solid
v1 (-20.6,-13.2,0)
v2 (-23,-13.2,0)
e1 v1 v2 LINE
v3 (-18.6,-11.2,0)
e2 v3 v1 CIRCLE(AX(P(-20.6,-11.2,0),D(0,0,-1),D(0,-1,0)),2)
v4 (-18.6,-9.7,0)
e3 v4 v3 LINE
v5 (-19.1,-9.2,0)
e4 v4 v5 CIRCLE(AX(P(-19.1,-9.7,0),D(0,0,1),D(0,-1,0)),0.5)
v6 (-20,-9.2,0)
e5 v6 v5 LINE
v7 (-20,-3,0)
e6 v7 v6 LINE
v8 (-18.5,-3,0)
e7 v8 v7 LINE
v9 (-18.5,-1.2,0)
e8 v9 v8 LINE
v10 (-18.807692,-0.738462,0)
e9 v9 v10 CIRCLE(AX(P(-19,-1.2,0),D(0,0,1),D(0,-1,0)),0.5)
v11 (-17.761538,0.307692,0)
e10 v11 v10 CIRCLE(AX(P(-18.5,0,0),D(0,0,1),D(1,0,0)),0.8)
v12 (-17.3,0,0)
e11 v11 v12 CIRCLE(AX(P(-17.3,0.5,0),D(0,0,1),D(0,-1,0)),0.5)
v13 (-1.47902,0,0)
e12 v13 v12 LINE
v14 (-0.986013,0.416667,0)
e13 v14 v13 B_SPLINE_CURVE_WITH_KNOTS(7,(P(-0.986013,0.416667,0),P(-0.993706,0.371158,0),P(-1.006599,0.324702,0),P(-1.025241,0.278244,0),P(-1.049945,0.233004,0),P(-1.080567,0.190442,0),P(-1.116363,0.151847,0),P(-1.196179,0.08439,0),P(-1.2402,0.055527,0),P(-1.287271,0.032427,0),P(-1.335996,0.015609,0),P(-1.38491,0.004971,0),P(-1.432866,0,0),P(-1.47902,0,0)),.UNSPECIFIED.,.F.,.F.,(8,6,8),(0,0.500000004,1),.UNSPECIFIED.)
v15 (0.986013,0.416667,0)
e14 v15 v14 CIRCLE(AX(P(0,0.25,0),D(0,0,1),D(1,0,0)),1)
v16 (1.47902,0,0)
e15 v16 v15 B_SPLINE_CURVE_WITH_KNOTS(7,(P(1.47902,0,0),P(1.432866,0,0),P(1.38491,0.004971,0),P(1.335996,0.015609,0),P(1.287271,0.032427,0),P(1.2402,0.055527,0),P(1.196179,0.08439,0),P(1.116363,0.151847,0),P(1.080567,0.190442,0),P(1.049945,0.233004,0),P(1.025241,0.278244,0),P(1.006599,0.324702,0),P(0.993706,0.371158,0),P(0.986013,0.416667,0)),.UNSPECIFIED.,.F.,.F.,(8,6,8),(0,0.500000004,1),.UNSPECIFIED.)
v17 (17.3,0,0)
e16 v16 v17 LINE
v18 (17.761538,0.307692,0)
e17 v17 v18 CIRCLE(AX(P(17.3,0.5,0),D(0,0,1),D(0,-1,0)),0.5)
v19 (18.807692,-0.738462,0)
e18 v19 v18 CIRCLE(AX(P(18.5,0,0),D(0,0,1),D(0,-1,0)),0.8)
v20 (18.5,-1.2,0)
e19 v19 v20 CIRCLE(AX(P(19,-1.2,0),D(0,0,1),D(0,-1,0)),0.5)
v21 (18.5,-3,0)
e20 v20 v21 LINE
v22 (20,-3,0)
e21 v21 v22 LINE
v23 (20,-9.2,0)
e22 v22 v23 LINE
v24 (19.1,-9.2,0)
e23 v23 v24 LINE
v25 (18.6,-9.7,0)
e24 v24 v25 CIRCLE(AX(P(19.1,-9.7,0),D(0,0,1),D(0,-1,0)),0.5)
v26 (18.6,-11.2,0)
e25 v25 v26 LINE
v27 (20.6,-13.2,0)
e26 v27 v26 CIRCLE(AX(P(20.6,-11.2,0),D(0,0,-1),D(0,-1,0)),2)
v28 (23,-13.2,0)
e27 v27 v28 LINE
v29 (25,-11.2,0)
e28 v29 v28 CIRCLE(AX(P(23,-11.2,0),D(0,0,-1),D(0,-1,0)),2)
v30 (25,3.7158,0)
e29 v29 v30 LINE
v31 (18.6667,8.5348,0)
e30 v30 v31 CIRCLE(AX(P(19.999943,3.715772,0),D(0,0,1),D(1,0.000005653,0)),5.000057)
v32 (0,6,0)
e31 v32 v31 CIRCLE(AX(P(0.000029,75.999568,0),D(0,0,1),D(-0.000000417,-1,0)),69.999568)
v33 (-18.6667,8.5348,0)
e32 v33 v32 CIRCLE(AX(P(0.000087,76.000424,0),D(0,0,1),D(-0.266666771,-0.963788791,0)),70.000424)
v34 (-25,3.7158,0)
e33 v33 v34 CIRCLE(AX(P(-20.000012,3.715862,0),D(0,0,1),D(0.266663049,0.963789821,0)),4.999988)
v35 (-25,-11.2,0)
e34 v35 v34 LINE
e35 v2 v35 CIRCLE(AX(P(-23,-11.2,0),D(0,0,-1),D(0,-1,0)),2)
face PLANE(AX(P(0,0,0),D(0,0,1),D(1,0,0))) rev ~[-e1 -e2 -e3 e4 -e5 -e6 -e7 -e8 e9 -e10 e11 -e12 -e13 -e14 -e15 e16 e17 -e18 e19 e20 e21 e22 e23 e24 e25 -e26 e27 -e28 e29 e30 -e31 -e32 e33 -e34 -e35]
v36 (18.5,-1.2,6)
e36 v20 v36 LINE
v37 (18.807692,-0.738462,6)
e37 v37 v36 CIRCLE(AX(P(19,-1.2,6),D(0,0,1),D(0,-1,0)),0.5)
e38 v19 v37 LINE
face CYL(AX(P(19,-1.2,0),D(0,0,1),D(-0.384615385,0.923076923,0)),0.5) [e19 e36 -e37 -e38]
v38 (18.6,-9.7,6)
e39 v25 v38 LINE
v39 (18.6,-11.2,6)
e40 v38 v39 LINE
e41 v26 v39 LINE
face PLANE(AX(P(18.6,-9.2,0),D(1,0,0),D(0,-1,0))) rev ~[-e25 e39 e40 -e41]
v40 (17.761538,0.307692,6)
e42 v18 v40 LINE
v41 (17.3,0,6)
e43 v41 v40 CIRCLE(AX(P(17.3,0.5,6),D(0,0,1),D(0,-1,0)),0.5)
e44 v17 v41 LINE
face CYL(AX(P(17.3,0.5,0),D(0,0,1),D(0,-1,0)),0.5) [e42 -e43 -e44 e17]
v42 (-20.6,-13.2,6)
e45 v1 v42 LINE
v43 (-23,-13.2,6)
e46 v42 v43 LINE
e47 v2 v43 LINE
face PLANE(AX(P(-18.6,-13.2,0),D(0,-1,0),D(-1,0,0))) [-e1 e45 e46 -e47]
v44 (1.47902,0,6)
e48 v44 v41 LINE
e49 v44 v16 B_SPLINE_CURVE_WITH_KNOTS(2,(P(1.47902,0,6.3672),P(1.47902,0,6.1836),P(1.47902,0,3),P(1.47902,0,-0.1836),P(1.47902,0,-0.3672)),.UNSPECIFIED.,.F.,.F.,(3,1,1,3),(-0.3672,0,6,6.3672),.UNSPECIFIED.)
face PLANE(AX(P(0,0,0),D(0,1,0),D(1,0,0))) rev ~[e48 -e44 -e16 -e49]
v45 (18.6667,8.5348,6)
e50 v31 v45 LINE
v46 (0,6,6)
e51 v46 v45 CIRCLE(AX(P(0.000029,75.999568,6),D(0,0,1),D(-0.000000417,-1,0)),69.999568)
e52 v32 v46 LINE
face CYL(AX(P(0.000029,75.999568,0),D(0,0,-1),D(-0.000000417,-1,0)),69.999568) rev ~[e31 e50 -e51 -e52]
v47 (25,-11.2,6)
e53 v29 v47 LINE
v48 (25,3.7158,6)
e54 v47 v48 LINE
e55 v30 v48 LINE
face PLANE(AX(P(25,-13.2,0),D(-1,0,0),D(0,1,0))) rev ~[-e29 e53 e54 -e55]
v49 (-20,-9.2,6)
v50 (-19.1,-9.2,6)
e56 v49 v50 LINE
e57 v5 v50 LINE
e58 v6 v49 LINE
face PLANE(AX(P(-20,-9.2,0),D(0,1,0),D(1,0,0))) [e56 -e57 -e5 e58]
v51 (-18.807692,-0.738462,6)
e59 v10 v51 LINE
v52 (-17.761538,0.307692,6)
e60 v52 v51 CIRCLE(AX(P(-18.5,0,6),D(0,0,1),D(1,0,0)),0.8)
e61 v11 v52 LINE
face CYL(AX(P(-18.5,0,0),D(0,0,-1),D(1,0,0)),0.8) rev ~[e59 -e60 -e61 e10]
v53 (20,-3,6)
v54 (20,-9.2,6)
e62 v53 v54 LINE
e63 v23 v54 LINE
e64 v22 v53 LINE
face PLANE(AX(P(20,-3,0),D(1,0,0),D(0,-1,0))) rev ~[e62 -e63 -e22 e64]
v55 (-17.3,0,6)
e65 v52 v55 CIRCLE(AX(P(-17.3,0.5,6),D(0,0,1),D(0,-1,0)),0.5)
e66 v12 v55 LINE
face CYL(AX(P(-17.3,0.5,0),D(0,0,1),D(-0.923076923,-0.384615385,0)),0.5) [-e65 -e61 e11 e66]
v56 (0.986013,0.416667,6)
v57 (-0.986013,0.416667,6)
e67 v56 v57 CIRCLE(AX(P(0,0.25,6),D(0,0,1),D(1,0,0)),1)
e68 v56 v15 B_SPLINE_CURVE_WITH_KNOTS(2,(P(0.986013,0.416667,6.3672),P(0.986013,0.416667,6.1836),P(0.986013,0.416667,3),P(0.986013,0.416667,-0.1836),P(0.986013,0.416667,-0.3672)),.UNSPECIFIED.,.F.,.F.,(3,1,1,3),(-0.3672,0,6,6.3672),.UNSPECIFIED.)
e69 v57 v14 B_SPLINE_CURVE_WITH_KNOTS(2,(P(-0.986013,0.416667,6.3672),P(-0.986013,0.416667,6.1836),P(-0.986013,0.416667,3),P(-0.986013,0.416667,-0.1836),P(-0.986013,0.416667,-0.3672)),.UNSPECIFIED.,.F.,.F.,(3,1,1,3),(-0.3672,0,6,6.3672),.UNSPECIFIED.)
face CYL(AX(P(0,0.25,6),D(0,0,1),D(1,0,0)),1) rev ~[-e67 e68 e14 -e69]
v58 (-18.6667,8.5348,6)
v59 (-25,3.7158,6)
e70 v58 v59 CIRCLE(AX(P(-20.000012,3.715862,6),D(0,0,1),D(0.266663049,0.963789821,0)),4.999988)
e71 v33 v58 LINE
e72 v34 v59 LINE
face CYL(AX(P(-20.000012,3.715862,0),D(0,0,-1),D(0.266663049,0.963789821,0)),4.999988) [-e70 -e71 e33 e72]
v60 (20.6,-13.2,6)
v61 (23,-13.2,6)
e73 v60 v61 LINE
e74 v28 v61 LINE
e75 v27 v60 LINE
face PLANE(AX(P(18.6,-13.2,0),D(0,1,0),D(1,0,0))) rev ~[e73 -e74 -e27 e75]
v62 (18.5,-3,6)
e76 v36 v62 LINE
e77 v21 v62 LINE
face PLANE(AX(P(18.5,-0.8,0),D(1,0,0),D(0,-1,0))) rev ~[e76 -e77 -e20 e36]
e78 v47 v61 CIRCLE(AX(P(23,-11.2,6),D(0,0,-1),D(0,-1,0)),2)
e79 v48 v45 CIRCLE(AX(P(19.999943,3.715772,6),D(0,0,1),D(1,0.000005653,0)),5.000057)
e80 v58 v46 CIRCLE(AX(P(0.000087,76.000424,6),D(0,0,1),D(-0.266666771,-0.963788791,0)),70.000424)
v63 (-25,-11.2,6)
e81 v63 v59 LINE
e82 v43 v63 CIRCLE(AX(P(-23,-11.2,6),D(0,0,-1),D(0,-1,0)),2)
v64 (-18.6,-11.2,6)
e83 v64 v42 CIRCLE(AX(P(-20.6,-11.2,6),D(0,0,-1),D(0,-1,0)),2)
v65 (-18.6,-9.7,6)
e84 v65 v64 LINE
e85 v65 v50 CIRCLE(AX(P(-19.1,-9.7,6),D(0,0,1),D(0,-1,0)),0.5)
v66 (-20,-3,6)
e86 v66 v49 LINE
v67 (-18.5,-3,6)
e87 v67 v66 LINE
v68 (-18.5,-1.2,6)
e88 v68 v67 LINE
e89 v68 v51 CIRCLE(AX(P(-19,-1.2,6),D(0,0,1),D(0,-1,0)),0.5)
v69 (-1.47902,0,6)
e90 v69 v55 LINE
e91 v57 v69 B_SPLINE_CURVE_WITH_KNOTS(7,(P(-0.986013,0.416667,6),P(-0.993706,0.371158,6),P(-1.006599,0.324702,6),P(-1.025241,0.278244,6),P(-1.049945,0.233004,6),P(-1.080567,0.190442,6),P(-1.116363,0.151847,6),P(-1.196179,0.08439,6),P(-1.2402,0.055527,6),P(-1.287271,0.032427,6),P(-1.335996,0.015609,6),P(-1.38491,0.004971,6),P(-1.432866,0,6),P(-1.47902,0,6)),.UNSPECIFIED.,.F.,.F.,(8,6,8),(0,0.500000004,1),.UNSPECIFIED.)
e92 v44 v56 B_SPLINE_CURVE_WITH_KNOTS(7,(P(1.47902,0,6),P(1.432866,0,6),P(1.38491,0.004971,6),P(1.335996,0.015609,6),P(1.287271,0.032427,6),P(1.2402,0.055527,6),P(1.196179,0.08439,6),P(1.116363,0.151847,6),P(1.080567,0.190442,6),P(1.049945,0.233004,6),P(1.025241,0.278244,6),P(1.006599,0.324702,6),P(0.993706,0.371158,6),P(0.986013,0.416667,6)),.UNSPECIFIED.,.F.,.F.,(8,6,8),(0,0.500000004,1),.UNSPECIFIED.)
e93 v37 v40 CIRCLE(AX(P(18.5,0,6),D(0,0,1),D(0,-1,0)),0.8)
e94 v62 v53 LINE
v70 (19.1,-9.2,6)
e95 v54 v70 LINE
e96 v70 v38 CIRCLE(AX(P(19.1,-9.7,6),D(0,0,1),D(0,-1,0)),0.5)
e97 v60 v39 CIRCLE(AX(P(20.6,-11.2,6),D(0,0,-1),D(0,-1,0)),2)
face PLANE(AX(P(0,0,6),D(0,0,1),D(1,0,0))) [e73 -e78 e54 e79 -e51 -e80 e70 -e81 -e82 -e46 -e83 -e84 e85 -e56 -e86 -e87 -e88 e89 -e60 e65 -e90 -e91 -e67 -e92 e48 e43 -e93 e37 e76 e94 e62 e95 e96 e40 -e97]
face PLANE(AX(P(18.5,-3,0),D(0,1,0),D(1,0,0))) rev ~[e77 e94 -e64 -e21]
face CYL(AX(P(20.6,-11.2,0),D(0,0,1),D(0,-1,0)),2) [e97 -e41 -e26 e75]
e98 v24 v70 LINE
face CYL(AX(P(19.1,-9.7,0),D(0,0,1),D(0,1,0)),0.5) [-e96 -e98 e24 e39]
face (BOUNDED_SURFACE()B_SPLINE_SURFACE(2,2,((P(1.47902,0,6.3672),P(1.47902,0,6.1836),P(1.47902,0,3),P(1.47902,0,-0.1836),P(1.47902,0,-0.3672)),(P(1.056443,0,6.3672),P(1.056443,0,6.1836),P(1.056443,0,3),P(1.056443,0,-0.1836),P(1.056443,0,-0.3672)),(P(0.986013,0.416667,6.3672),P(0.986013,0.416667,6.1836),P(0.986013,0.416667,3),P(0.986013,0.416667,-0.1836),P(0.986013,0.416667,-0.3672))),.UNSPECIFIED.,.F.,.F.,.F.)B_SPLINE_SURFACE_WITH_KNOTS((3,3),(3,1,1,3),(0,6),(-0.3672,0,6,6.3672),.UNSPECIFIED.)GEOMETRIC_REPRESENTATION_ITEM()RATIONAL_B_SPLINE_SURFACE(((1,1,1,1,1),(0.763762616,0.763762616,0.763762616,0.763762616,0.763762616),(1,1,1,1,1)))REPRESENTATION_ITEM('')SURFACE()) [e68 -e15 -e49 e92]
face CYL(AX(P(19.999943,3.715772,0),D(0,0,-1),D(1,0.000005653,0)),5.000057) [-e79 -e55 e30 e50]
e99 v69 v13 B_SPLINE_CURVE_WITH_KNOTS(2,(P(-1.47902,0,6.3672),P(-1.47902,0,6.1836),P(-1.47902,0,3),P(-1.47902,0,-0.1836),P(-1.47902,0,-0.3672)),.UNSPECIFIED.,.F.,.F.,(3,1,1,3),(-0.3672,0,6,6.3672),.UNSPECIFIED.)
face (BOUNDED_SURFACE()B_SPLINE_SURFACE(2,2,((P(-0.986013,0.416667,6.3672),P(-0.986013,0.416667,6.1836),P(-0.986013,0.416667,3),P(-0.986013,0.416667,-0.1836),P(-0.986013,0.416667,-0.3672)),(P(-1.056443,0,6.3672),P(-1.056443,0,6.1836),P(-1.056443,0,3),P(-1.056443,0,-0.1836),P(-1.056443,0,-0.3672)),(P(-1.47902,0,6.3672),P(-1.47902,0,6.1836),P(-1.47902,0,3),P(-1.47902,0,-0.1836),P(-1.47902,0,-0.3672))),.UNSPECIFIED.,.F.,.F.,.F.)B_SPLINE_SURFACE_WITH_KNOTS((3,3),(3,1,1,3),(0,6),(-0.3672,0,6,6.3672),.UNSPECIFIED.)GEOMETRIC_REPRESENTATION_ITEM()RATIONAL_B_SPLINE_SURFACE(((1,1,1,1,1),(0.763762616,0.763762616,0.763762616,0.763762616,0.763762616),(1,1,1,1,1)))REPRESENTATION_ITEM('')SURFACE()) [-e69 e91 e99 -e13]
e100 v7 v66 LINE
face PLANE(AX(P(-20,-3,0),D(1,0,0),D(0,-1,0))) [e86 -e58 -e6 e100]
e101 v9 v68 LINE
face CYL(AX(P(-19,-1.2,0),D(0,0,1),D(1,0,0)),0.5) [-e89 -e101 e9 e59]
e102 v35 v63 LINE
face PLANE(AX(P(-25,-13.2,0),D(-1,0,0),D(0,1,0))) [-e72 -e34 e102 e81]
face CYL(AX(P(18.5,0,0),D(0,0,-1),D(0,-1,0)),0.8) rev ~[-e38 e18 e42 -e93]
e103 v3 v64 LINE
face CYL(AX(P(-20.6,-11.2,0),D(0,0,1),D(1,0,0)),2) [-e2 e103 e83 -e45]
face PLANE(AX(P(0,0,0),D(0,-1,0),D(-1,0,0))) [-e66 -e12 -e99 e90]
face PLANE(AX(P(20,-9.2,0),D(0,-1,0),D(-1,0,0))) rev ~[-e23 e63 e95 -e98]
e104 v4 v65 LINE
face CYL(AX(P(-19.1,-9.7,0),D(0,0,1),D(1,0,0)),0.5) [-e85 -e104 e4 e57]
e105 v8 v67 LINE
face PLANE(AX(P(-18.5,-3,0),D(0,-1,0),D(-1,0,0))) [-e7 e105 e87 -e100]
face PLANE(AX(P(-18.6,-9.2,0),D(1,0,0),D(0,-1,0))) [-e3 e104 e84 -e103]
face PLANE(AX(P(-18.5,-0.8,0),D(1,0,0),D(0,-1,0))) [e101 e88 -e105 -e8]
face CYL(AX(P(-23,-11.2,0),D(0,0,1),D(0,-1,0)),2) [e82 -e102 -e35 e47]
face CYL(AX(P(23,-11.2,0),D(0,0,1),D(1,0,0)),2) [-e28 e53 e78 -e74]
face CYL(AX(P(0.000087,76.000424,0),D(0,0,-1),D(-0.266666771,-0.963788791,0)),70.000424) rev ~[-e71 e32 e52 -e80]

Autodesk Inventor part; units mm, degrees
ref_plane "YZ Plane" through (0, 0, 0) normal (1, 0, 0) x (0, 1, 0)
ref_plane "XZ Plane" through (0, 0, 0) normal (0, 1, 0) x (-1, 0, 0)
ref_plane "XY Plane" through (0, 0, 0) normal (0, 0, 1) x (1, 0, 0)
sketch "Sketch1" plane through (0, 0, 0) normal (0, 0, 1) x (1, 0, 0)
  line L0 (0, 0) -> (-17.7, 0)
  line L1 (-20, -9.2) -> (-18.6, -9.2)
  line L2 (-18.6, -9.2) -> (-18.6, -13.2)
  line L3 (-18.6, -13.2) -> (-25, -13.2)
  line L4 (-25, -13.2) -> (-25, 3.7158)
  arc A0 (-18.6667, 8.5348) -> (-25, 3.7158) centre (-20, 3.7158) ccw
  arc A1 (-18.6667, 8.5348) -> (0, 6) centre (0, 76) ccw
  line L5 (0, 0) -> (0, 6) construction
  line L6 (-18.5, -0.8) -> (-18.5, -3)
  line L7 (-18.5, -3) -> (-20, -3)
  line L8 (-20, -3) -> (-20, -9.2)
  arc A2 (-17.7, 0) -> (-18.5, -0.8) centre (-18.5, 0) ccw
  line L9 (0, 0) -> (17.7, 0)
  line L10 (20, -9.2) -> (18.6, -9.2)
  line L11 (18.6, -9.2) -> (18.6, -13.2)
  line L12 (18.6, -13.2) -> (25, -13.2)
  line L13 (25, -13.2) -> (25, 3.7158)
  arc A3 (25, 3.7158) -> (18.6667, 8.5348) centre (20, 3.7158) ccw
  arc A4 (0, 6) -> (18.6667, 8.5348) centre (0, 76) ccw
  line L14 (18.5, -0.8) -> (18.5, -3)
  line L15 (18.5, -3) -> (20, -3)
  line L16 (20, -3) -> (20, -9.2)
  arc A5 (18.5, -0.8) -> (17.7, 0) centre (18.5, 0) ccw
  line L17 (-20, 8.7158) -> (20, 8.7158) construction
  dimension "d0" = 6
  dimension "d4" = 6.2
  dimension "d5" = 1.5
  dimension "d7" = 4
  dimension "d9" = 5
  dimension "d10" = 70
  dimension "d11" = 5
  dimension "d12" = 0.8
  dimension "d13" = 3
  dimension "d18" = 1.4
  dimension "d20" = 18.5
  dimension "d26" = 8.7158
extrude "Extrusion1" add sketch "Sketch1" along normal blind 6
fillet "Fillet1" radius 2 4 edges at (-18.6, -13.2, 3) (-25, -13.2, 3) (18.6, -13.2, 3) (25, -13.2, 3)
fillet "Fillet2" radius 0.5 2 edges at (-18.6, -9.2, 3) (18.6, -9.2, 3)
fillet "Fillet3" radius 0.5 4 edges at (-18.5, -0.8, 3) (-17.7, 0, 3) (17.7, 0, 3) (18.5, -0.8, 3)
sketch "Sketch2" plane through (0, 0, 6) normal (0, 0, 1) x (1, 0, 0)
  arc A0 (1, 0.25) -> (-1, 0.25) centre (0, 0.25) ccw
  line L0 (-17.3, 0) -> (17.3, 0) projected
  line L1 (-1, 0.25) -> (-1, 0)
  line L2 (1, 0.25) -> (1, 0)
  point P0 (0, 0)
  point P1 (0, 0)
  dimension "d21" = 0.25
  dimension "d25" = 1
extrude "Extrusion2" cut sketch "Sketch2" against normal through all
fillet "Fillet4" radius 0.5 2 edges at (-1, 0, 3) (1, 0, 3)
equation "\"d5\" = GripLength"
equation "\"d20\" = 0.5 * BattECOD - GripLength"
equation "\"GripLength\" = 1.5"
equation "\"BattECOD\" = 40"
properties part number "Twist Lock"
